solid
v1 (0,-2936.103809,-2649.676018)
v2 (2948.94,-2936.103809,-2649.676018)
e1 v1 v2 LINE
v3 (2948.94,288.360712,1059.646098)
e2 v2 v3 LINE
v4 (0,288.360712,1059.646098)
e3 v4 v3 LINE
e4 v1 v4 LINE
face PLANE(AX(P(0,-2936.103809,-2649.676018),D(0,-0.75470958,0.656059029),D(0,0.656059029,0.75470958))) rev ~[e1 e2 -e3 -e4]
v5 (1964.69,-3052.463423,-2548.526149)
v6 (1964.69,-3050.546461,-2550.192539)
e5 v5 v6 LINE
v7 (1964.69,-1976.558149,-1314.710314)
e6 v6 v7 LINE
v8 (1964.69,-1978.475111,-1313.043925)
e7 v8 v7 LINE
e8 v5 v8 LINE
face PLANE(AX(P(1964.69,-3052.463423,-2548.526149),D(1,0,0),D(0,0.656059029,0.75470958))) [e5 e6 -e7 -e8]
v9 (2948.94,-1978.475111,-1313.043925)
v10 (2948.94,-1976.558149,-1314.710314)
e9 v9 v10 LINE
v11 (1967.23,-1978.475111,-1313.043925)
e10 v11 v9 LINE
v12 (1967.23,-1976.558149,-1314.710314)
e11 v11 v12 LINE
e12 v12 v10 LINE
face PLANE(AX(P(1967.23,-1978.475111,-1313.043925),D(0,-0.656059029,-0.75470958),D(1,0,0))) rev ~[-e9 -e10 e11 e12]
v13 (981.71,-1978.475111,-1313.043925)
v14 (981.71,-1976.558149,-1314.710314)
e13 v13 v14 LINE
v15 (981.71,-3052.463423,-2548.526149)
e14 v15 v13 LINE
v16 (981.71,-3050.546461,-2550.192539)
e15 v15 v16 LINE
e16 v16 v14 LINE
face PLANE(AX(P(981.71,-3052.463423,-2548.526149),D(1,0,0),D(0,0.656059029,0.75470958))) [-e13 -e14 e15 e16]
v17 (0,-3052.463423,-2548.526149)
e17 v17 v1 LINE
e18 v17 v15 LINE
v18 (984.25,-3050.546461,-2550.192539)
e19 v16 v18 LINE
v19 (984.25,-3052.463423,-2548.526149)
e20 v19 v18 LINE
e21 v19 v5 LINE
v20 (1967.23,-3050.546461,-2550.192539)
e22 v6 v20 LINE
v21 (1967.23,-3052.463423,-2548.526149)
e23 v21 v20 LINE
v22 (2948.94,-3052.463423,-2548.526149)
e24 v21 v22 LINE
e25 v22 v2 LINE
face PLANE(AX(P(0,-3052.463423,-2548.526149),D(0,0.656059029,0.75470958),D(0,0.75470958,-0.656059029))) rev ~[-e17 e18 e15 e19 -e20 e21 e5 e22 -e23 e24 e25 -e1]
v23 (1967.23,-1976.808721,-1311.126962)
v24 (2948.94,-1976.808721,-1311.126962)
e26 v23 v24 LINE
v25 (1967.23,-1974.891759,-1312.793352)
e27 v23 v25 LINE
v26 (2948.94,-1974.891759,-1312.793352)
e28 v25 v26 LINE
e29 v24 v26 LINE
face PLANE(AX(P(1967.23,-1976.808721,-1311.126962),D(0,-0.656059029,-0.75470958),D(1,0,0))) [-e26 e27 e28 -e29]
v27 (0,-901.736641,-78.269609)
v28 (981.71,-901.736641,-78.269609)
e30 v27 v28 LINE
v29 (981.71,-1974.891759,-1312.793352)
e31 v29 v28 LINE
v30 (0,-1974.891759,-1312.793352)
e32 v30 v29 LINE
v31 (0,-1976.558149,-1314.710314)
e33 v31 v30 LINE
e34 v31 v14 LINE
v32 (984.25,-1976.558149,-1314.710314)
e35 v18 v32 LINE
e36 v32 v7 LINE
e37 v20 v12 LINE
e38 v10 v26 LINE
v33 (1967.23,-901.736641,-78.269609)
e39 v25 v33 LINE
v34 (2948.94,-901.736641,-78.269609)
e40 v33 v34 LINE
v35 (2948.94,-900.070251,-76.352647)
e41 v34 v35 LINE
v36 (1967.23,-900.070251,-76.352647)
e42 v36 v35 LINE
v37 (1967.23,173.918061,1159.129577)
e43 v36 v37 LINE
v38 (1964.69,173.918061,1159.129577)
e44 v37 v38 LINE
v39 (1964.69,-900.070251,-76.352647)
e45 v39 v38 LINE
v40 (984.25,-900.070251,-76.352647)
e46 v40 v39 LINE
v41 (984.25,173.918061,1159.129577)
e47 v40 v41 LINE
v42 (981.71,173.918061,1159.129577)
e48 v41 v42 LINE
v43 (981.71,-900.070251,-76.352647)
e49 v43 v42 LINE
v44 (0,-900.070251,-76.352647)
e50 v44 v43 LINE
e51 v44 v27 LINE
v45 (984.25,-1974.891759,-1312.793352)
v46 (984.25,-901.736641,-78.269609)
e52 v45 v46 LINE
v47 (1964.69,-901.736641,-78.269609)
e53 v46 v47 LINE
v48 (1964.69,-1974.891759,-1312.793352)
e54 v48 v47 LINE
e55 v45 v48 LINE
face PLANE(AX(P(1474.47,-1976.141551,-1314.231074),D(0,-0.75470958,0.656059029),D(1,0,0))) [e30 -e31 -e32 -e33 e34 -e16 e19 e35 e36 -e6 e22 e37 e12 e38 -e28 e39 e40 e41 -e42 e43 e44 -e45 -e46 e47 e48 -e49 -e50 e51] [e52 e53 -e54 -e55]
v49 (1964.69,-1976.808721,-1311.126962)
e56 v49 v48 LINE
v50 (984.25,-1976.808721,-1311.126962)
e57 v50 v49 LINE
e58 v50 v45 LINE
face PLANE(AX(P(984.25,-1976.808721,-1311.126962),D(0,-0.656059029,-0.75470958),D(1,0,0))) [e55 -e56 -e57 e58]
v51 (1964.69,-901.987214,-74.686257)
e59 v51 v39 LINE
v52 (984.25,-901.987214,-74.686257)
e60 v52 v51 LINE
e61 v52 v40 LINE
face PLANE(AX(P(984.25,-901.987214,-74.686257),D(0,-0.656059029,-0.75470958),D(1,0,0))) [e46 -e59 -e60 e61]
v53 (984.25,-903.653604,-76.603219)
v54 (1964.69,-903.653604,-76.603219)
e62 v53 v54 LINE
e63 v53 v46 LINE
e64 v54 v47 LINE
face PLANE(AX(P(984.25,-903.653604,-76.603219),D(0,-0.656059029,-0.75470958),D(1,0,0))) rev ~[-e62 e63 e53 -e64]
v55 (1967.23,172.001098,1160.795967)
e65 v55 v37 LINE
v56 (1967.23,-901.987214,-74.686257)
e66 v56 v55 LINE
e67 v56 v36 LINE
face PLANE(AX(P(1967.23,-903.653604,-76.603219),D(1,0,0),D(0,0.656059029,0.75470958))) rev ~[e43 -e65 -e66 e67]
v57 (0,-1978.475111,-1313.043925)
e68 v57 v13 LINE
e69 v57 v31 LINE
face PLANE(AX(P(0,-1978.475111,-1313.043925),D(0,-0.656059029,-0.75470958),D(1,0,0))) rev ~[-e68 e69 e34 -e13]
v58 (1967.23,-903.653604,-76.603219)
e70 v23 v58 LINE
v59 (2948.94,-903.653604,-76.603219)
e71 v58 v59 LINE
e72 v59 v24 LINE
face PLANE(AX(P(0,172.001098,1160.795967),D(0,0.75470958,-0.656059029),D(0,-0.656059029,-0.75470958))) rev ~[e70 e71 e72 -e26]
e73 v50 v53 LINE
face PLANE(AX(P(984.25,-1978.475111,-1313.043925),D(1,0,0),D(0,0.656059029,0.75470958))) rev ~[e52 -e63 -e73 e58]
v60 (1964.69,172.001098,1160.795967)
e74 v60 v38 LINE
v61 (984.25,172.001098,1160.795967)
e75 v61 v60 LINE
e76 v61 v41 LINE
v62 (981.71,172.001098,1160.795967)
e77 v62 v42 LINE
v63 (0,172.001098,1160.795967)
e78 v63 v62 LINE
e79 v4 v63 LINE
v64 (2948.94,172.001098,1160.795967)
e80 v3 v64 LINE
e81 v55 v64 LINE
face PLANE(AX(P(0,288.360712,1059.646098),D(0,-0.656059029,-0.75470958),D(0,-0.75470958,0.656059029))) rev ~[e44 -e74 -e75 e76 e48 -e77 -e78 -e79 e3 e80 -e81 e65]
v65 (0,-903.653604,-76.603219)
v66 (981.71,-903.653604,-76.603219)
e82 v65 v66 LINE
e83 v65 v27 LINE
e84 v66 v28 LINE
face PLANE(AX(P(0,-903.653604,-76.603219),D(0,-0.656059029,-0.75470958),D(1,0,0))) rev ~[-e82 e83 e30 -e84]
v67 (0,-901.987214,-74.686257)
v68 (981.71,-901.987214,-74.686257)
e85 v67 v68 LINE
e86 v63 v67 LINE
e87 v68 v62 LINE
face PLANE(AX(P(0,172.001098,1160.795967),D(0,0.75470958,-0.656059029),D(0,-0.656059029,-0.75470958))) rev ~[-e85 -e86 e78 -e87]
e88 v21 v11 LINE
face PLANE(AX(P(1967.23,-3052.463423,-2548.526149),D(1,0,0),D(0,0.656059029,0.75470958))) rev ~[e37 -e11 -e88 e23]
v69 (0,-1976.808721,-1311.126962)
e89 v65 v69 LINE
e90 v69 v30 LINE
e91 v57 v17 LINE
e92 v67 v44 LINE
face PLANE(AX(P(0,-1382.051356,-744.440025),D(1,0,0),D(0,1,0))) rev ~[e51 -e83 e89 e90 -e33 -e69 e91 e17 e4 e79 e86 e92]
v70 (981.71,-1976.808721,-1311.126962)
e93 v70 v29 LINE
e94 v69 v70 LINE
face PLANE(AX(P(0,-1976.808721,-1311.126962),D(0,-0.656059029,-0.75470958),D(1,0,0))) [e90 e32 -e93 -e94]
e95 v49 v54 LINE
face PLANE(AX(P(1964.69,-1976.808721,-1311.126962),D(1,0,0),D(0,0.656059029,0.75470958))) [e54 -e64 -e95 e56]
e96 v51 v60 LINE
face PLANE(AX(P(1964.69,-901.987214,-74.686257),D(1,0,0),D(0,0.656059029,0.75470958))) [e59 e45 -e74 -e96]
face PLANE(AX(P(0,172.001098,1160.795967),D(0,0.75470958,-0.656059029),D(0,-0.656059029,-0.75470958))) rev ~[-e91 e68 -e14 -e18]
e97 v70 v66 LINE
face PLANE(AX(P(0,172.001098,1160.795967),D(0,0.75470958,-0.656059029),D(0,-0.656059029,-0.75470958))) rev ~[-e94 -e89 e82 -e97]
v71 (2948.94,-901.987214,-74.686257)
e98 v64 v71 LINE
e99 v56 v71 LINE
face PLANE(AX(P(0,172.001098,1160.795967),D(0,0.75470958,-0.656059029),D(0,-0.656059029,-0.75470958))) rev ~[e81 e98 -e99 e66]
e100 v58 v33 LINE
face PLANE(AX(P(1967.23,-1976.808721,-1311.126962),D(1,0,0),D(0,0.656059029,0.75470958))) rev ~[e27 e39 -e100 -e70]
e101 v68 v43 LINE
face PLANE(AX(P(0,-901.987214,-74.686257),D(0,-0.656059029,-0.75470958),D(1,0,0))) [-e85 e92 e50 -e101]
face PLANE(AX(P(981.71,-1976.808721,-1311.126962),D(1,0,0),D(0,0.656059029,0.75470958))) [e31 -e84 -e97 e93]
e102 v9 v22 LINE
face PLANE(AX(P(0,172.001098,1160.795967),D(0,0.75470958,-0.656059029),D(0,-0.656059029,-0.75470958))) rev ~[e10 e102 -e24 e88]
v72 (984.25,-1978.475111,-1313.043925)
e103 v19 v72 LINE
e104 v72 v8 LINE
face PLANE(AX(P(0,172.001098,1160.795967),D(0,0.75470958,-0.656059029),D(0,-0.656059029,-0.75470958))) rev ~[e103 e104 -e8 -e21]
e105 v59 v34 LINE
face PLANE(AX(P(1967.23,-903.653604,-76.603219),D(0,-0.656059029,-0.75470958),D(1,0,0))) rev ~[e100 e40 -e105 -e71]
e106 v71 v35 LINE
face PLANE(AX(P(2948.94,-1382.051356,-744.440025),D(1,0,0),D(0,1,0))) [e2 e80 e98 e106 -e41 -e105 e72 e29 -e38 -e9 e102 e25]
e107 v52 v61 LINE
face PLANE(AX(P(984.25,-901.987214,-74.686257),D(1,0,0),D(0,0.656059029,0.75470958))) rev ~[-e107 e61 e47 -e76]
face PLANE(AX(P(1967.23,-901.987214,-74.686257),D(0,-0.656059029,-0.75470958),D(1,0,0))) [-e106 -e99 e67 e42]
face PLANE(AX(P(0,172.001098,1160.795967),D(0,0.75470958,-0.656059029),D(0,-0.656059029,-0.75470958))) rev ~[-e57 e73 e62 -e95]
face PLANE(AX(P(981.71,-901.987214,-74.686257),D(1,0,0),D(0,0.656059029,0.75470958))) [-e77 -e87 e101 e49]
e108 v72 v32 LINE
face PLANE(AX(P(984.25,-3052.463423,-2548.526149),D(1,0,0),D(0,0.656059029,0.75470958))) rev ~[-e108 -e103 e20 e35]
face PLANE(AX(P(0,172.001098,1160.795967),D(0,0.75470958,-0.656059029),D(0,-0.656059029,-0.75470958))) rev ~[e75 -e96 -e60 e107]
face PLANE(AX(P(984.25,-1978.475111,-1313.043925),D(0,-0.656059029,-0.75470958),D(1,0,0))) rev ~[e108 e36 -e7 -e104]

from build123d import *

# Parameters (mm, degrees)
F1_DEPTH = 2948.94
F2_W     = 981.71
F2_H     = 1.27
F2_W_2   = 1.27
F2_H_2   = 1637.03
F2_H_3   = 1635.76
F2_W_3   = 980.44
F3_DEPTH = 2.54
F4_DEPTH = 2.54


with BuildPart() as f1:
    # F0 (on Right) → F1 (new body)
    with BuildSketch(Plane.YZ):
        Polygon((-2936.1038094659, -2649.6760176359), (0, 727.9250450949), (288.3607121196, 1059.646098201), (172.00109846, 1160.7959671727), (-3052.4634231254, -2548.5261486642), align=None)
    extrude(amount=F1_DEPTH)

    # F2 (on face) → F3 (cut)
    with BuildSketch(Plane(origin=(0, -476.780077957, 414.458598623), x_dir=(1, 0, 0), z_dir=(0, -0.7547095802, 0.656059029))):
        with Locations((490.855, -648.7582892498)):
            Rectangle(F2_W, F2_H)
        with Locations((982.345, 170.3917107502)):
            Rectangle(F2_W_2, F2_H_2)
        with Locations((490.855, -650.0282892498)):
            Rectangle(F2_W, F2_H)
        with Locations((982.345, -648.7582892498)):
            Rectangle(F2_W_2, F2_H)
        with Locations((983.615, 170.3917107502)):
            Rectangle(F2_W_2, F2_H_2)
        with Locations((982.345, -650.0282892498)):
            Rectangle(F2_W_2, F2_H)
        with Locations((983.615, -648.7582892498)):
            Rectangle(F2_W_2, F2_H)
        with Locations((490.855, -2287.0582892498)):
            Rectangle(F2_W, F2_H)
        with Locations((982.345, -1468.5432892498)):
            Rectangle(F2_W_2, F2_H_3)
        with Locations((983.615, -650.0282892498)):
            Rectangle(F2_W_2, F2_H)
        with Locations((1474.47, -648.7582892498)):
            Rectangle(F2_W_3, F2_H)
        with Locations((1965.325, 170.3917107502)):
            Rectangle(F2_W_2, F2_H_2)
        with Locations((982.345, -2287.0582892498)):
            Rectangle(F2_W_2, F2_H)
        with Locations((983.615, -1468.5432892498)):
            Rectangle(F2_W_2, F2_H_3)
        with Locations((1474.47, -650.0282892498)):
            Rectangle(F2_W_3, F2_H)
        with Locations((1965.325, -648.7582892498)):
            Rectangle(F2_W_2, F2_H)
        with Locations((1966.595, 170.3917107502)):
            Rectangle(F2_W_2, F2_H_2)
        with Locations((982.345, -2288.3282892498)):
            Rectangle(F2_W_2, F2_H)
        with Locations((983.615, -2287.0582892498)):
            Rectangle(F2_W_2, F2_H)
        with Locations((1965.325, -650.0282892498)):
            Rectangle(F2_W_2, F2_H)
        with Locations((1966.595, -648.7582892498)):
            Rectangle(F2_W_2, F2_H)
        with Locations((983.615, -2288.3282892498)):
            Rectangle(F2_W_2, F2_H)
        with Locations((1966.595, -650.0282892498)):
            Rectangle(F2_W_2, F2_H)
    extrude(amount=-F3_DEPTH, mode=Mode.SUBTRACT)

    # F2 (on face) → F4 (cut)
    with BuildSketch(Plane(origin=(0, -476.780077957, 414.458598623), x_dir=(1, 0, 0), z_dir=(0, -0.7547095802, 0.656059029))):
        with Locations((490.855, -2288.3282892498)):
            Rectangle(F2_W, F2_H)
        with Locations((983.615, -3107.4782892498)):
            Rectangle(F2_W_2, F2_H_2)
        with Locations((982.345, -3107.4782892498)):
            Rectangle(F2_W_2, F2_H_2)
        with Locations((982.345, -2288.3282892498)):
            Rectangle(F2_W_2, F2_H)
        with Locations((1474.47, -2288.3282892498)):
            Rectangle(F2_W_3, F2_H)
        with Locations((1474.47, -2287.0582892498)):
            Rectangle(F2_W_3, F2_H)
        with Locations((2458.085, -648.7582892498)):
            Rectangle(F2_W, F2_H)
        with Locations((2458.085, -650.0282892498)):
            Rectangle(F2_W, F2_H)
        with Locations((1966.595, -1468.5432892498)):
            Rectangle(F2_W_2, F2_H_3)
        with Locations((1965.325, -1468.5432892498)):
            Rectangle(F2_W_2, F2_H_3)
        with Locations((1965.325, -2287.0582892498)):
            Rectangle(F2_W_2, F2_H)
        with Locations((1965.325, -2288.3282892498)):
            Rectangle(F2_W_2, F2_H)
        with Locations((1966.595, -2287.0582892498)):
            Rectangle(F2_W_2, F2_H)
        with Locations((1966.595, -2288.3282892498)):
            Rectangle(F2_W_2, F2_H)
        with Locations((2458.085, -2287.0582892498)):
            Rectangle(F2_W, F2_H)
        with Locations((1965.325, -3107.4782892498)):
            Rectangle(F2_W_2, F2_H_2)
        with Locations((1966.595, -3107.4782892498)):
            Rectangle(F2_W_2, F2_H_2)
        with Locations((2458.085, -2288.3282892498)):
            Rectangle(F2_W, F2_H)
    extrude(amount=-F4_DEPTH, mode=Mode.SUBTRACT)


solid = f1.part
